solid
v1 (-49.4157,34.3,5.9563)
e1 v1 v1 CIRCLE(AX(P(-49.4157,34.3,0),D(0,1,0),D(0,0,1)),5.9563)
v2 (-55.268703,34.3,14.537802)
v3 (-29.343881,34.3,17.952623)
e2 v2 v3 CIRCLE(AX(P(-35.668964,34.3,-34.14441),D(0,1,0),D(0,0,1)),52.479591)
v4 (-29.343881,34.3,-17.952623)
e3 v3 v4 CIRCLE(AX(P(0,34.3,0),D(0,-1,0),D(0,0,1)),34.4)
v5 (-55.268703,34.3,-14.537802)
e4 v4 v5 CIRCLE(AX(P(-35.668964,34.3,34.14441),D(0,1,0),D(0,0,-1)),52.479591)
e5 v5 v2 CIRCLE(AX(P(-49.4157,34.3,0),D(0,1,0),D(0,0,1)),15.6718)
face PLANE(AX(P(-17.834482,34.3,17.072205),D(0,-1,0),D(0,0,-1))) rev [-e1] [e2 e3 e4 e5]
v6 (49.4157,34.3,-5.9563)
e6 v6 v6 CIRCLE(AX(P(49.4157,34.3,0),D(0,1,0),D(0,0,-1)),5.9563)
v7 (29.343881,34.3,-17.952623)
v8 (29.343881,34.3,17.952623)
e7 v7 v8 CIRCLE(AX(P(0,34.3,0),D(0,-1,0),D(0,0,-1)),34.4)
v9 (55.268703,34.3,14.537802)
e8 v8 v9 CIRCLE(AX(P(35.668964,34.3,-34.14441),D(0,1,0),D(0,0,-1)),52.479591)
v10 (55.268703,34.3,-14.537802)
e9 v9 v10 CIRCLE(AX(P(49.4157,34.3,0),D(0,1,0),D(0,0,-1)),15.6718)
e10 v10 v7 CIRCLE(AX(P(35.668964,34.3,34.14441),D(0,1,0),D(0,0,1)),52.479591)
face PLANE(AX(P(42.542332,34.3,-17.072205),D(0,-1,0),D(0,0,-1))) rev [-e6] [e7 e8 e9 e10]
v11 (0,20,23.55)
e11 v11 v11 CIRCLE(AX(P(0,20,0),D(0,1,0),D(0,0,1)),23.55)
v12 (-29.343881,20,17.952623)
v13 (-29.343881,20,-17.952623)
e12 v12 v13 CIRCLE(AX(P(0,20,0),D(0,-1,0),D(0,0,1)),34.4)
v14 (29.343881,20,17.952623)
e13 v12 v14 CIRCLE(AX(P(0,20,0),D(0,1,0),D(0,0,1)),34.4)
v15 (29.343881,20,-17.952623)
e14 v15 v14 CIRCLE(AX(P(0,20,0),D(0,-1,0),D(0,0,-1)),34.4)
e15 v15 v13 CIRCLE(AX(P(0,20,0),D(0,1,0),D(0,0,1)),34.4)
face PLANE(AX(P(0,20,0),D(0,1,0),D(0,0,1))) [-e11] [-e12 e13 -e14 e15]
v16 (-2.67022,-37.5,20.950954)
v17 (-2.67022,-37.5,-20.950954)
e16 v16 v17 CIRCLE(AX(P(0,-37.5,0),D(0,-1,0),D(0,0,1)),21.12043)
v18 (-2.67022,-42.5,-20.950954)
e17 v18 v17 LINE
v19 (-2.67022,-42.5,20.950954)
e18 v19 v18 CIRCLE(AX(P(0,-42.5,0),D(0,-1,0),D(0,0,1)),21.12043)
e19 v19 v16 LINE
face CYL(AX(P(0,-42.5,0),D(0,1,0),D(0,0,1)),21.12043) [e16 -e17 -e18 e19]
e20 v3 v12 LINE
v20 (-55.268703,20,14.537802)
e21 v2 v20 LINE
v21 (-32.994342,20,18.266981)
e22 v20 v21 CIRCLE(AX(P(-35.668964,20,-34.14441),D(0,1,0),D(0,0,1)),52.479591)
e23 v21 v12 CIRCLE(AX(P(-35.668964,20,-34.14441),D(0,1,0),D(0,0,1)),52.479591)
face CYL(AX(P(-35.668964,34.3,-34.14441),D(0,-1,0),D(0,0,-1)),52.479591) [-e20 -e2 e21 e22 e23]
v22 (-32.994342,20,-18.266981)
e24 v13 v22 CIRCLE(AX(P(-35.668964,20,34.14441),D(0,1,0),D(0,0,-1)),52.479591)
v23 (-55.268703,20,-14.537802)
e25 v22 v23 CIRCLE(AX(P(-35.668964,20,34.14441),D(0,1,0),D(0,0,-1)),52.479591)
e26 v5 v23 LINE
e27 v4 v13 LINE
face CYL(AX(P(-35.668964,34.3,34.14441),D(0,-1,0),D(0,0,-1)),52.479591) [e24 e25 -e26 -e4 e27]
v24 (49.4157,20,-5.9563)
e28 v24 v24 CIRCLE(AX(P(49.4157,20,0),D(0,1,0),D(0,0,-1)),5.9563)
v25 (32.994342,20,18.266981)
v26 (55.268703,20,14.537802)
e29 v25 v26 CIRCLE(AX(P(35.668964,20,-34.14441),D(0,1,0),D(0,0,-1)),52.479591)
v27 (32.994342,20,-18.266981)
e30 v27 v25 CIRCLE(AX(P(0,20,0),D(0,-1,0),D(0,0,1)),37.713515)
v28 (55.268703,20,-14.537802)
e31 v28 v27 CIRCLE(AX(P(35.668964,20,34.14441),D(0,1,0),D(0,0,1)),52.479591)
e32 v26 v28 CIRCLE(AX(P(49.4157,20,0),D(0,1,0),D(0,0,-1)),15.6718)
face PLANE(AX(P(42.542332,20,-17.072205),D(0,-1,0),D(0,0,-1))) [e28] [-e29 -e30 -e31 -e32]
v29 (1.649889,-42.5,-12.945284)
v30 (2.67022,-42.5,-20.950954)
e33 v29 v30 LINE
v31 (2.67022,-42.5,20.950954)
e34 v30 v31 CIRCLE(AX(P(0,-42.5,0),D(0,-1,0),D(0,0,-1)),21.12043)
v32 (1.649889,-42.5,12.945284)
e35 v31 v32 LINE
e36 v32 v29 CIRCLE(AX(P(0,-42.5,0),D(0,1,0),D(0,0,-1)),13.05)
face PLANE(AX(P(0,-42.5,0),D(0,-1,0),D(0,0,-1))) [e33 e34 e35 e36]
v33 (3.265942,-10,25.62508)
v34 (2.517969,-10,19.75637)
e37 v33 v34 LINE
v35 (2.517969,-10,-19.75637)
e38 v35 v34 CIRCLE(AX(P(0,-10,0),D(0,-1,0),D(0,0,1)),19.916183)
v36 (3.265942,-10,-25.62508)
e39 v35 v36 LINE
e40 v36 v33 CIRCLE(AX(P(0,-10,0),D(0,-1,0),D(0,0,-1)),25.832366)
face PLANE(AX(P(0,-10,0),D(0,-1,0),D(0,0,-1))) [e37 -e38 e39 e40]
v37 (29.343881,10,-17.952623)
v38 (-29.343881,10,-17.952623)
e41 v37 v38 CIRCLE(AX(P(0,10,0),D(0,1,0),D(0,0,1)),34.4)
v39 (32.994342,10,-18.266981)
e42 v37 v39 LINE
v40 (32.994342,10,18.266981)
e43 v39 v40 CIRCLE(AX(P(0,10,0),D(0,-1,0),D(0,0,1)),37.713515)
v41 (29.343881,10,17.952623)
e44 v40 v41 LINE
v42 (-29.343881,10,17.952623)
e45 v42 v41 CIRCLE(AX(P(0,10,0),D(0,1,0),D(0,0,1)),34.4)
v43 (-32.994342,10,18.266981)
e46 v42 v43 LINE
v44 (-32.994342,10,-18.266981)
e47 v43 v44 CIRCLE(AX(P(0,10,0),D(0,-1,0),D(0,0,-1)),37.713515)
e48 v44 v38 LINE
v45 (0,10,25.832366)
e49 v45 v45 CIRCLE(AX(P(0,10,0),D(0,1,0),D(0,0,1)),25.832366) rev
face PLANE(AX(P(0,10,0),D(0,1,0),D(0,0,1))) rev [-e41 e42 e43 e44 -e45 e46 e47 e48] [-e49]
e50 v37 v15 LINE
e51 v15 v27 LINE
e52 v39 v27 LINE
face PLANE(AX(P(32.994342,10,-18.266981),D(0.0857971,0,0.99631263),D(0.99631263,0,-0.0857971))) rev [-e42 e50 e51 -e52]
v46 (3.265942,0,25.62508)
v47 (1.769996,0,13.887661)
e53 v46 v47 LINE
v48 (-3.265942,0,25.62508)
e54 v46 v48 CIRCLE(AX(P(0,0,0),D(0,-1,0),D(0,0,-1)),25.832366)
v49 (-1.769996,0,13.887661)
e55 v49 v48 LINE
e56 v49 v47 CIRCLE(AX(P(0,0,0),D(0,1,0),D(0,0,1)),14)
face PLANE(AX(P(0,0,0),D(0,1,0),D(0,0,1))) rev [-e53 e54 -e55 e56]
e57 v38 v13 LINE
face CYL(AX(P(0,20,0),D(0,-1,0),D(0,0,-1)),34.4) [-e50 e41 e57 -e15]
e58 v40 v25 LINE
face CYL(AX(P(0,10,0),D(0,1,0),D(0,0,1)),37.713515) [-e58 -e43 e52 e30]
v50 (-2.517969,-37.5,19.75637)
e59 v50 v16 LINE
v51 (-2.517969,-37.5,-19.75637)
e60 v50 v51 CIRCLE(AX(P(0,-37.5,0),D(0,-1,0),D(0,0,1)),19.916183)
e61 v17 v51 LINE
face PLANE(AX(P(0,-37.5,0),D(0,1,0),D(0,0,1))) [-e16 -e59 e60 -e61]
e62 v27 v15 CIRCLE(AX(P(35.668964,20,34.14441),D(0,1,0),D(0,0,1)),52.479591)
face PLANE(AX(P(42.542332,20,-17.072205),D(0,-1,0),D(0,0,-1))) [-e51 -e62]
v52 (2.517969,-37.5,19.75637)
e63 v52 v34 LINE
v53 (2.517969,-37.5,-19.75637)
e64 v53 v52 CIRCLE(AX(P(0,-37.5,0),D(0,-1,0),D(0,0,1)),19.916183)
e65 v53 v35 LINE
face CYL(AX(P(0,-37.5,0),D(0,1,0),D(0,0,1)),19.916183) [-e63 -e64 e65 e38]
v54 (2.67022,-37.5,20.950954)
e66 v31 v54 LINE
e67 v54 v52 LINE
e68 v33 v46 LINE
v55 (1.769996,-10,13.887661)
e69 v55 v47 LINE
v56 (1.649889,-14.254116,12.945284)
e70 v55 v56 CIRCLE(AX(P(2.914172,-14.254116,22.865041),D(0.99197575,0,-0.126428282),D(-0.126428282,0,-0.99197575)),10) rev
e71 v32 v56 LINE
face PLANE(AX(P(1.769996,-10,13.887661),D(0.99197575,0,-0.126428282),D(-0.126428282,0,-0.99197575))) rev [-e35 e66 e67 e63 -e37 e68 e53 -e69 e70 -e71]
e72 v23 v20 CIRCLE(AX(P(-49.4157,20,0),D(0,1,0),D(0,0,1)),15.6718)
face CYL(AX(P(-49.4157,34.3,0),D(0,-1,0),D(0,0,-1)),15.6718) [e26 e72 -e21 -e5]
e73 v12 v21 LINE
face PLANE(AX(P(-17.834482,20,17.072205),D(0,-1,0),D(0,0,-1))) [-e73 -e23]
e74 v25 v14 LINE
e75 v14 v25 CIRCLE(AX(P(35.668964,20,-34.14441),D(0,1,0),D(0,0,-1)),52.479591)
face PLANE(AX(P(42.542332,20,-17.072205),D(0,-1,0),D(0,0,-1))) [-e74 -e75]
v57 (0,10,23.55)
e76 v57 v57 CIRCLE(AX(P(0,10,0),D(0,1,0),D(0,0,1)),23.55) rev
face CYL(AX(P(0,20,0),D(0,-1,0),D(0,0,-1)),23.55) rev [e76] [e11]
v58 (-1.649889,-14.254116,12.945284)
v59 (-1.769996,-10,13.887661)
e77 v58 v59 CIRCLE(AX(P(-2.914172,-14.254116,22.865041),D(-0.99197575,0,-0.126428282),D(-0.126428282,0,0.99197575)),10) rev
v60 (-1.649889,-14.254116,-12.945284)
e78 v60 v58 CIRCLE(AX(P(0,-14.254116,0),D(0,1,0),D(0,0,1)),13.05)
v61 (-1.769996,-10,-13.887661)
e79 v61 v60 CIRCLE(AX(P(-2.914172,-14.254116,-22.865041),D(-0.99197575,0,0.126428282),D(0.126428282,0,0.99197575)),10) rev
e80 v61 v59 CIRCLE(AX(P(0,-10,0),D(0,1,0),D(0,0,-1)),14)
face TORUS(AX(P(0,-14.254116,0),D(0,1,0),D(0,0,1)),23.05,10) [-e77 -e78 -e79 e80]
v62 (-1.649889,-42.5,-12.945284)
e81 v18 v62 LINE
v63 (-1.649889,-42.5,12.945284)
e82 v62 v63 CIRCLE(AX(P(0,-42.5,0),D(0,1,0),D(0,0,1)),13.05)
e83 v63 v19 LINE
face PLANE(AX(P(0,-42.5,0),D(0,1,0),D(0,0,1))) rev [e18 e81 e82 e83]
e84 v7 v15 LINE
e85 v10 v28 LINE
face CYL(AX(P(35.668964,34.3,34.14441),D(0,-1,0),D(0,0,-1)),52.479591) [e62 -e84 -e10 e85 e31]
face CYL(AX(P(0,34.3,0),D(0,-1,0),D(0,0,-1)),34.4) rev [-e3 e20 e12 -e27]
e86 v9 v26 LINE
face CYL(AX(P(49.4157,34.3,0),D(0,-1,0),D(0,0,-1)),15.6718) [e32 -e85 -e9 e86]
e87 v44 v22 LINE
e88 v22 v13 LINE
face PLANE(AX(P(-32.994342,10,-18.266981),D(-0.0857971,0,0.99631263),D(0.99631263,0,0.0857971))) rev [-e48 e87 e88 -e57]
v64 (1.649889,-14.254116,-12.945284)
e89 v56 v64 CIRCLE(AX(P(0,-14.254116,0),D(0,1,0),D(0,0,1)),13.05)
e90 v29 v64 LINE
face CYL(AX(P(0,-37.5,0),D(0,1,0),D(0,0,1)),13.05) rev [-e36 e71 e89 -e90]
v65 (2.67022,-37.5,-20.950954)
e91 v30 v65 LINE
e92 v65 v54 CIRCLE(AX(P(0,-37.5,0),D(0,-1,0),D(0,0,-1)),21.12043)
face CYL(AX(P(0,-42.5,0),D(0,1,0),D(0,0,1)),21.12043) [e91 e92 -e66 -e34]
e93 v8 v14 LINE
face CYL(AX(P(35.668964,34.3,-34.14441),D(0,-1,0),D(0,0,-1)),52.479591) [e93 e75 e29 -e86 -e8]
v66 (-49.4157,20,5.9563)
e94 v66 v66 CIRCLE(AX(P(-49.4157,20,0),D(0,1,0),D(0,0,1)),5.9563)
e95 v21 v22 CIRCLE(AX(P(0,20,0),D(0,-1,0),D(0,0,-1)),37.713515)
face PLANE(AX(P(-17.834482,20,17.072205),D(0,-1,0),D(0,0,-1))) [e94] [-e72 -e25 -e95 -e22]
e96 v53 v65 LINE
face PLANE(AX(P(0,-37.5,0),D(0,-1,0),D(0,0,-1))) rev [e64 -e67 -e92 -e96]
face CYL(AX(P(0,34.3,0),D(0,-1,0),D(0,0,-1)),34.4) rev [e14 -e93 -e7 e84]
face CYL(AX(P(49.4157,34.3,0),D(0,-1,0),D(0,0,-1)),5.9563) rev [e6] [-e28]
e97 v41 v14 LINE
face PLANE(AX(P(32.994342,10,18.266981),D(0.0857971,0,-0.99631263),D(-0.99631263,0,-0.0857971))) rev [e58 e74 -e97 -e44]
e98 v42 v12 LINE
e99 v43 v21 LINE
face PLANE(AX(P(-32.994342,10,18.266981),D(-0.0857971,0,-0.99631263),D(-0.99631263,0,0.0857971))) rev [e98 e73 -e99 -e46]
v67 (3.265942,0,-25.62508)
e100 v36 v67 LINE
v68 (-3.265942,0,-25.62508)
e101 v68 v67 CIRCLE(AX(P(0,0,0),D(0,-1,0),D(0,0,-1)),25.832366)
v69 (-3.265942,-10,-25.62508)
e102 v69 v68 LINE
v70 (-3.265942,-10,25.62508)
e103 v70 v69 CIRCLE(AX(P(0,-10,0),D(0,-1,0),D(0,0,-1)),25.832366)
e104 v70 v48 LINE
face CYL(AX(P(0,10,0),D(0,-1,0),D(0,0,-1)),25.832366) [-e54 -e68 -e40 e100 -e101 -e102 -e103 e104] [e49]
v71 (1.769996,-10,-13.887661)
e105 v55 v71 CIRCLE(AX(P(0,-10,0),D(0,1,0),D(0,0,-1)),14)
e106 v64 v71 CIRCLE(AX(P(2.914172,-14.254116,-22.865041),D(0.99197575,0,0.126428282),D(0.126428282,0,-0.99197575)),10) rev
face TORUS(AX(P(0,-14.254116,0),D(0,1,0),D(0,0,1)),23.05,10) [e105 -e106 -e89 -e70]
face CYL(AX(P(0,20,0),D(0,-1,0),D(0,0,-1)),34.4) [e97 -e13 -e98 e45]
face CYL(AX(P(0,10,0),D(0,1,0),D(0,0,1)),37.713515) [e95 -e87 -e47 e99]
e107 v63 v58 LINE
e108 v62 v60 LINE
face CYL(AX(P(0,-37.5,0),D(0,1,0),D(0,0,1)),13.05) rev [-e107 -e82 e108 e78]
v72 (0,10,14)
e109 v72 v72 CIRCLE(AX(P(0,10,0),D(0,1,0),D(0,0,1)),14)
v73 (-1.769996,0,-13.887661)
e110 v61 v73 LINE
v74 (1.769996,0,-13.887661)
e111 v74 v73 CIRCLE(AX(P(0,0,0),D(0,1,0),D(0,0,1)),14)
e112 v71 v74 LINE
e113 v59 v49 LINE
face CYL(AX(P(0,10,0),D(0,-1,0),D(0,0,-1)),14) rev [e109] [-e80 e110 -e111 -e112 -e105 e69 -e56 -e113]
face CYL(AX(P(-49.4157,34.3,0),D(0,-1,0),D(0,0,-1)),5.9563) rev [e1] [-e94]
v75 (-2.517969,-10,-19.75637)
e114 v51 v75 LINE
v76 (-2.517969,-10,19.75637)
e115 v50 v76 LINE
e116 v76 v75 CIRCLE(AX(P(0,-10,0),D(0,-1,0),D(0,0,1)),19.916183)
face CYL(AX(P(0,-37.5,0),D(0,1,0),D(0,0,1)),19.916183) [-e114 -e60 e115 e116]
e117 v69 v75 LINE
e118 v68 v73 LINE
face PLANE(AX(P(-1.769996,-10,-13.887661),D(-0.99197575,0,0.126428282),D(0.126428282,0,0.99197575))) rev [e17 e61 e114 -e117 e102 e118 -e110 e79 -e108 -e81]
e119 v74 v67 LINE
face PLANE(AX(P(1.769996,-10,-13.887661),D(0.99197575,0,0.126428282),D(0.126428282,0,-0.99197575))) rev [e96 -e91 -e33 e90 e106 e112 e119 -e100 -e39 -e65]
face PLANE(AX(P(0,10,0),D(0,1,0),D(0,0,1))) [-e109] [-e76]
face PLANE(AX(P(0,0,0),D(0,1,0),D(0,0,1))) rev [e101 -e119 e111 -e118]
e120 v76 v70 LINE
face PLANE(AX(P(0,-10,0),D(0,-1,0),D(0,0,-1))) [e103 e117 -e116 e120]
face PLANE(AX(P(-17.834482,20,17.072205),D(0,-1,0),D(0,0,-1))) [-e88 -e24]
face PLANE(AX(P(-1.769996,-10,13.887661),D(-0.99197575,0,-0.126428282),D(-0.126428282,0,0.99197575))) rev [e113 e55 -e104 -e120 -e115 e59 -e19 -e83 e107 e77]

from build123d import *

# Parameters (mm, degrees)
SKETCH1_R             = 23.55
SKETCH1_R_2           = 14
BOSS_EXTRUDE4_DEPTH   = 10
SKETCH6_R             = 34.4
SKETCH6_R_2           = 23.55
BOSS_EXTRUDE5_DEPTH   = 10
SKETCH8_R             = 5.9563
BOSS_EXTRUDE7_DEPTH   = 14.3
BOSS_EXTRUDE7_2_DEPTH = 14.3
BOSS_EXTRUDE8_DEPTH   = 10
SKETCH10_R            = 25.832365573
SKETCH10_R_2          = 23.55
BOSS_EXTRUDE9_DEPTH   = 10
BOSS_EXTRUDE10_START  = 10
BOSS_EXTRUDE10_DEPTH  = 10
BOSS_EXTRUDE11_DEPTH  = 27.5
FILLET4_R             = 10
FILLET5_R             = 10
BOSS_EXTRUDE13_DEPTH  = 5


with BuildPart() as part:
    # Sketch1 → Boss-Extrude4 (new body)
    with BuildSketch(Plane(origin=(0, 0, 0), x_dir=(1, 0, 0), z_dir=(0, 1, 0))):
        with Locations(Location((0, 0, 0), (0, 0, 270))):
            Circle(SKETCH1_R)
        with Locations(Location((0, 0, 0), (0, 0, 270))):
            Circle(SKETCH1_R_2, mode=Mode.SUBTRACT)
    extrude(amount=BOSS_EXTRUDE4_DEPTH)



with BuildPart() as body_2:
    # Sketch6 → Boss-Extrude5 (new body)
    with BuildSketch(Plane(origin=(0, 10, 0), x_dir=(1, 0, 0), z_dir=(0, 1, 0))):
        with Locations(Location((0, 0, 0), (0, 0, 270))):
            Circle(SKETCH6_R)
        with Locations(Location((0, 0, 0), (0, 0, 270))):
            Circle(SKETCH6_R_2, mode=Mode.SUBTRACT)
    extrude(amount=BOSS_EXTRUDE5_DEPTH)



with BuildPart() as body_3:
    # Sketch8 → Boss-Extrude7 (new body)
    with BuildSketch(Plane(origin=(0, 20, 0), x_dir=(1, 0, 0), z_dir=(0, 1, 0))):
        with BuildLine():
            ThreePointArc((-55.268702708, 14.537801572), (-65.0875, 0), (-55.268702708, -14.537801572))
            ThreePointArc((-55.268702708, -14.537801572), (-42.522384328, -17.885755457), (-29.343880761, -17.952622702))
            ThreePointArc((-29.343880761, -17.952622702), (-34.4, 0), (-29.343880761, 17.952622702))
            ThreePointArc((-29.343880761, 17.952622702), (-42.522384328, 17.885755457), (-55.268702708, 14.537801572))
        make_face()
        with Locations(Location((-49.4157, 0, 0), (0, 0, 270))):
            Circle(SKETCH8_R, mode=Mode.SUBTRACT)
    extrude(amount=BOSS_EXTRUDE7_DEPTH)


with BuildPart() as body_4:
    # Sketch8 → Boss-Extrude7 2 (new body)
    with BuildSketch(Plane(origin=(0, 20, 0), x_dir=(1, 0, 0), z_dir=(0, 1, 0))):
        with BuildLine():
            ThreePointArc((55.268702708, 14.537801572), (42.522384328, 17.885755457), (29.343880761, 17.952622702))
            ThreePointArc((29.343880761, 17.952622702), (34.4, 0), (29.343880761, -17.952622702))
            ThreePointArc((29.343880761, -17.952622702), (42.522384328, -17.885755457), (55.268702708, -14.537801572))
            ThreePointArc((55.268702708, -14.537801572), (65.0875, 0), (55.268702708, 14.537801572))
        make_face()
        with Locations(Location((49.4157, 0, 0), (0, 0, 90))):
            Circle(SKETCH8_R, mode=Mode.SUBTRACT)
    extrude(amount=BOSS_EXTRUDE7_2_DEPTH)


with BuildPart() as body_2_1:
    add(body_2.part)

    add(body_3.part)  # Boss-Extrude8 merges body 3

    add(body_4.part)  # Boss-Extrude8 merges body 4
    # Sketch9 → Boss-Extrude8 (add)
    with BuildSketch(Plane.XZ.offset(-20)):
        with BuildLine():
            Line((-32.994341825, 18.26698083), (-29.343880761, 17.952622702))
            ThreePointArc((-29.343880761, 17.952622702), (-34.4, 0), (-29.343880761, -17.952622702))
            Line((-29.343880761, -17.952622702), (-32.994341825, -18.26698083))
            ThreePointArc((-32.994341825, -18.26698083), (-37.713514569, 0), (-32.994341825, 18.26698083))
        make_face()
        with BuildLine():
            Line((32.994341825, 18.26698083), (29.343880761, 17.952622702))
            ThreePointArc((29.343880761, 17.952622702), (34.4, 0), (29.343880761, -17.952622702))
            Line((29.343880761, -17.952622702), (32.994341825, -18.26698083))
            ThreePointArc((32.994341825, -18.26698083), (37.713514569, 0), (32.994341825, 18.26698083))
        make_face()
    extrude(amount=BOSS_EXTRUDE8_DEPTH)


with BuildPart() as part_1:
    add(part.part)

    add(body_2_1.part)  # Boss-Extrude9 merges body 2
    # Sketch10 → Boss-Extrude9 (add)
    with BuildSketch(Plane.XZ):
        with Locations(Location((0, 0, 0), (0, 0, 270))):
            Circle(SKETCH10_R)
        with Locations(Location((0, 0, 0), (0, 0, 90))):
            Circle(SKETCH10_R_2, mode=Mode.SUBTRACT)
    extrude(amount=-BOSS_EXTRUDE9_DEPTH)

    # Sketch11 → Boss-Extrude10 (add)
    with BuildSketch(Plane.XZ.offset(BOSS_EXTRUDE10_START)):
        with BuildLine():
            Line((-1.769995947, 13.887660507), (-3.265941597, 25.625080225))
            ThreePointArc((-3.265941597, 25.625080225), (-25.832365573, 0), (-3.265941597, -25.625080225))
            Line((-3.265941597, -25.625080225), (-1.769995947, -13.887660507))
            ThreePointArc((-1.769995947, -13.887660507), (-14, 0), (-1.769995947, 13.887660507))
        make_face()
        with BuildLine():
            Line((1.769995947, -13.887660507), (3.265941597, -25.625080225))
            ThreePointArc((3.265941597, -25.625080225), (25.832365573, 0), (3.265941597, 25.625080225))
            Line((3.265941597, 25.625080225), (1.769995947, 13.887660507))
            ThreePointArc((1.769995947, 13.887660507), (14, 0), (1.769995947, -13.887660507))
        make_face()
    extrude(amount=-BOSS_EXTRUDE10_DEPTH)

    # Sketch12 → Boss-Extrude11 (add)
    with BuildSketch(Plane.XZ.offset(10)):
        with BuildLine():
            Line((-1.769995947, 13.887660507), (-2.517968772, 19.756370366))
            ThreePointArc((-2.517968772, 19.756370366), (-19.916182786, 0), (-2.517968772, -19.756370366))
            Line((-2.517968772, -19.756370366), (-1.769995947, -13.887660507))
            Line((-1.769995947, -13.887660507), (-1.649889079, -12.945283544))
            ThreePointArc((-1.649889079, -12.945283544), (-13.05, 0), (-1.649889079, 12.945283544))
            Line((-1.649889079, 12.945283544), (-1.769995947, 13.887660507))
        make_face()
        with BuildLine():
            Line((1.769995947, 13.887660507), (2.517968772, 19.756370366))
            ThreePointArc((2.517968772, 19.756370366), (19.916182786, 0), (2.517968772, -19.756370366))
            Line((2.517968772, -19.756370366), (1.769995947, -13.887660507))
            Line((1.769995947, -13.887660507), (1.649889079, -12.945283544))
            ThreePointArc((1.649889079, -12.945283544), (13.05, 0), (1.649889079, 12.945283544))
            Line((1.649889079, 12.945283544), (1.769995947, 13.887660507))
        make_face()
    extrude(amount=BOSS_EXTRUDE11_DEPTH)

    # Fillet4
    # the kernel refuses this fillet: 10 mm, written as the material it takes off along each edge
    with BuildSketch(Plane(origin=(0, -10, 0), x_dir=(-0.12642828192325106, 0, -0.9919757504747456), z_dir=(0.9919757504747456, 0, -0.12642828192325106))) as fillet4_piece_1:
        with BuildLine():
            CenterArc((23.05, -4.254115654), FILLET4_R, 154.823283059, 25.176716941)
            Line((13.05, -4.254115654), (12.85, -4.254115654))
            Line((12.85, -4.254115654), (12.85, 0))
            Line((12.85, 0), (13.05, 0.2))
            ThreePointArc((13.05, 0.2), (13.525, 0.2), (13.819, 0.085082313))
            Line((13.819, 0.085082313), (14, 0))
        make_face()
    revolve(axis=Axis((0, -10, 0), (0, 1, 0)), revolution_arc=165.473510519, mode=Mode.SUBTRACT)

    # Fillet5
    # the kernel refuses this fillet: 10 mm, written as the material it takes off along each edge
    with BuildSketch(Plane(origin=(0, -10, 0), x_dir=(-0.6360006800114754, 0, -0.7716884961076852), z_dir=(-0.7716884961076852, 0, 0.6360006800114754))) as fillet5_piece_1:
        with BuildLine():
            CenterArc((23.05, 4.254115654), FILLET5_R, 180, 25.176716941)
            Line((13.05, 4.254115654), (12.85, 4.254115654))
            Line((12.85, 4.254115654), (12.85, 0))
            Line((12.85, 0), (13.05, -0.2))
            ThreePointArc((13.05, -0.2), (13.525, -0.2), (13.819, -0.085082313))
            Line((13.819, -0.085082313), (14, 0))
        make_face()
    revolve(axis=Axis((0, -10, 0), (0, -1, 0)), revolution_arc=258.988485214, mode=Mode.SUBTRACT)

    # Sketch14 → Boss-Extrude13 (add)
    with BuildSketch(Plane.XZ.offset(37.5)):
        with BuildLine():
            Line((-1.649889079, 12.945283544), (-2.670219685, 20.950954455))
            ThreePointArc((-2.670219685, 20.950954455), (-21.120430056, 0), (-2.670219685, -20.950954455))
            Line((-2.670219685, -20.950954455), (-1.649889079, -12.945283544))
            ThreePointArc((-1.649889079, -12.945283544), (-13.05, 0), (-1.649889079, 12.945283544))
        make_face()
        with BuildLine():
            Line((2.670219685, -20.950954455), (1.649889079, -12.945283544))
            ThreePointArc((1.649889079, -12.945283544), (13.05, 0), (1.649889079, 12.945283544))
            Line((1.649889079, 12.945283544), (2.670219685, 20.950954455))
            ThreePointArc((2.670219685, 20.950954455), (21.120430056, 0), (2.670219685, -20.950954455))
        make_face()
    extrude(amount=BOSS_EXTRUDE13_DEPTH)


solid = part_1.part
